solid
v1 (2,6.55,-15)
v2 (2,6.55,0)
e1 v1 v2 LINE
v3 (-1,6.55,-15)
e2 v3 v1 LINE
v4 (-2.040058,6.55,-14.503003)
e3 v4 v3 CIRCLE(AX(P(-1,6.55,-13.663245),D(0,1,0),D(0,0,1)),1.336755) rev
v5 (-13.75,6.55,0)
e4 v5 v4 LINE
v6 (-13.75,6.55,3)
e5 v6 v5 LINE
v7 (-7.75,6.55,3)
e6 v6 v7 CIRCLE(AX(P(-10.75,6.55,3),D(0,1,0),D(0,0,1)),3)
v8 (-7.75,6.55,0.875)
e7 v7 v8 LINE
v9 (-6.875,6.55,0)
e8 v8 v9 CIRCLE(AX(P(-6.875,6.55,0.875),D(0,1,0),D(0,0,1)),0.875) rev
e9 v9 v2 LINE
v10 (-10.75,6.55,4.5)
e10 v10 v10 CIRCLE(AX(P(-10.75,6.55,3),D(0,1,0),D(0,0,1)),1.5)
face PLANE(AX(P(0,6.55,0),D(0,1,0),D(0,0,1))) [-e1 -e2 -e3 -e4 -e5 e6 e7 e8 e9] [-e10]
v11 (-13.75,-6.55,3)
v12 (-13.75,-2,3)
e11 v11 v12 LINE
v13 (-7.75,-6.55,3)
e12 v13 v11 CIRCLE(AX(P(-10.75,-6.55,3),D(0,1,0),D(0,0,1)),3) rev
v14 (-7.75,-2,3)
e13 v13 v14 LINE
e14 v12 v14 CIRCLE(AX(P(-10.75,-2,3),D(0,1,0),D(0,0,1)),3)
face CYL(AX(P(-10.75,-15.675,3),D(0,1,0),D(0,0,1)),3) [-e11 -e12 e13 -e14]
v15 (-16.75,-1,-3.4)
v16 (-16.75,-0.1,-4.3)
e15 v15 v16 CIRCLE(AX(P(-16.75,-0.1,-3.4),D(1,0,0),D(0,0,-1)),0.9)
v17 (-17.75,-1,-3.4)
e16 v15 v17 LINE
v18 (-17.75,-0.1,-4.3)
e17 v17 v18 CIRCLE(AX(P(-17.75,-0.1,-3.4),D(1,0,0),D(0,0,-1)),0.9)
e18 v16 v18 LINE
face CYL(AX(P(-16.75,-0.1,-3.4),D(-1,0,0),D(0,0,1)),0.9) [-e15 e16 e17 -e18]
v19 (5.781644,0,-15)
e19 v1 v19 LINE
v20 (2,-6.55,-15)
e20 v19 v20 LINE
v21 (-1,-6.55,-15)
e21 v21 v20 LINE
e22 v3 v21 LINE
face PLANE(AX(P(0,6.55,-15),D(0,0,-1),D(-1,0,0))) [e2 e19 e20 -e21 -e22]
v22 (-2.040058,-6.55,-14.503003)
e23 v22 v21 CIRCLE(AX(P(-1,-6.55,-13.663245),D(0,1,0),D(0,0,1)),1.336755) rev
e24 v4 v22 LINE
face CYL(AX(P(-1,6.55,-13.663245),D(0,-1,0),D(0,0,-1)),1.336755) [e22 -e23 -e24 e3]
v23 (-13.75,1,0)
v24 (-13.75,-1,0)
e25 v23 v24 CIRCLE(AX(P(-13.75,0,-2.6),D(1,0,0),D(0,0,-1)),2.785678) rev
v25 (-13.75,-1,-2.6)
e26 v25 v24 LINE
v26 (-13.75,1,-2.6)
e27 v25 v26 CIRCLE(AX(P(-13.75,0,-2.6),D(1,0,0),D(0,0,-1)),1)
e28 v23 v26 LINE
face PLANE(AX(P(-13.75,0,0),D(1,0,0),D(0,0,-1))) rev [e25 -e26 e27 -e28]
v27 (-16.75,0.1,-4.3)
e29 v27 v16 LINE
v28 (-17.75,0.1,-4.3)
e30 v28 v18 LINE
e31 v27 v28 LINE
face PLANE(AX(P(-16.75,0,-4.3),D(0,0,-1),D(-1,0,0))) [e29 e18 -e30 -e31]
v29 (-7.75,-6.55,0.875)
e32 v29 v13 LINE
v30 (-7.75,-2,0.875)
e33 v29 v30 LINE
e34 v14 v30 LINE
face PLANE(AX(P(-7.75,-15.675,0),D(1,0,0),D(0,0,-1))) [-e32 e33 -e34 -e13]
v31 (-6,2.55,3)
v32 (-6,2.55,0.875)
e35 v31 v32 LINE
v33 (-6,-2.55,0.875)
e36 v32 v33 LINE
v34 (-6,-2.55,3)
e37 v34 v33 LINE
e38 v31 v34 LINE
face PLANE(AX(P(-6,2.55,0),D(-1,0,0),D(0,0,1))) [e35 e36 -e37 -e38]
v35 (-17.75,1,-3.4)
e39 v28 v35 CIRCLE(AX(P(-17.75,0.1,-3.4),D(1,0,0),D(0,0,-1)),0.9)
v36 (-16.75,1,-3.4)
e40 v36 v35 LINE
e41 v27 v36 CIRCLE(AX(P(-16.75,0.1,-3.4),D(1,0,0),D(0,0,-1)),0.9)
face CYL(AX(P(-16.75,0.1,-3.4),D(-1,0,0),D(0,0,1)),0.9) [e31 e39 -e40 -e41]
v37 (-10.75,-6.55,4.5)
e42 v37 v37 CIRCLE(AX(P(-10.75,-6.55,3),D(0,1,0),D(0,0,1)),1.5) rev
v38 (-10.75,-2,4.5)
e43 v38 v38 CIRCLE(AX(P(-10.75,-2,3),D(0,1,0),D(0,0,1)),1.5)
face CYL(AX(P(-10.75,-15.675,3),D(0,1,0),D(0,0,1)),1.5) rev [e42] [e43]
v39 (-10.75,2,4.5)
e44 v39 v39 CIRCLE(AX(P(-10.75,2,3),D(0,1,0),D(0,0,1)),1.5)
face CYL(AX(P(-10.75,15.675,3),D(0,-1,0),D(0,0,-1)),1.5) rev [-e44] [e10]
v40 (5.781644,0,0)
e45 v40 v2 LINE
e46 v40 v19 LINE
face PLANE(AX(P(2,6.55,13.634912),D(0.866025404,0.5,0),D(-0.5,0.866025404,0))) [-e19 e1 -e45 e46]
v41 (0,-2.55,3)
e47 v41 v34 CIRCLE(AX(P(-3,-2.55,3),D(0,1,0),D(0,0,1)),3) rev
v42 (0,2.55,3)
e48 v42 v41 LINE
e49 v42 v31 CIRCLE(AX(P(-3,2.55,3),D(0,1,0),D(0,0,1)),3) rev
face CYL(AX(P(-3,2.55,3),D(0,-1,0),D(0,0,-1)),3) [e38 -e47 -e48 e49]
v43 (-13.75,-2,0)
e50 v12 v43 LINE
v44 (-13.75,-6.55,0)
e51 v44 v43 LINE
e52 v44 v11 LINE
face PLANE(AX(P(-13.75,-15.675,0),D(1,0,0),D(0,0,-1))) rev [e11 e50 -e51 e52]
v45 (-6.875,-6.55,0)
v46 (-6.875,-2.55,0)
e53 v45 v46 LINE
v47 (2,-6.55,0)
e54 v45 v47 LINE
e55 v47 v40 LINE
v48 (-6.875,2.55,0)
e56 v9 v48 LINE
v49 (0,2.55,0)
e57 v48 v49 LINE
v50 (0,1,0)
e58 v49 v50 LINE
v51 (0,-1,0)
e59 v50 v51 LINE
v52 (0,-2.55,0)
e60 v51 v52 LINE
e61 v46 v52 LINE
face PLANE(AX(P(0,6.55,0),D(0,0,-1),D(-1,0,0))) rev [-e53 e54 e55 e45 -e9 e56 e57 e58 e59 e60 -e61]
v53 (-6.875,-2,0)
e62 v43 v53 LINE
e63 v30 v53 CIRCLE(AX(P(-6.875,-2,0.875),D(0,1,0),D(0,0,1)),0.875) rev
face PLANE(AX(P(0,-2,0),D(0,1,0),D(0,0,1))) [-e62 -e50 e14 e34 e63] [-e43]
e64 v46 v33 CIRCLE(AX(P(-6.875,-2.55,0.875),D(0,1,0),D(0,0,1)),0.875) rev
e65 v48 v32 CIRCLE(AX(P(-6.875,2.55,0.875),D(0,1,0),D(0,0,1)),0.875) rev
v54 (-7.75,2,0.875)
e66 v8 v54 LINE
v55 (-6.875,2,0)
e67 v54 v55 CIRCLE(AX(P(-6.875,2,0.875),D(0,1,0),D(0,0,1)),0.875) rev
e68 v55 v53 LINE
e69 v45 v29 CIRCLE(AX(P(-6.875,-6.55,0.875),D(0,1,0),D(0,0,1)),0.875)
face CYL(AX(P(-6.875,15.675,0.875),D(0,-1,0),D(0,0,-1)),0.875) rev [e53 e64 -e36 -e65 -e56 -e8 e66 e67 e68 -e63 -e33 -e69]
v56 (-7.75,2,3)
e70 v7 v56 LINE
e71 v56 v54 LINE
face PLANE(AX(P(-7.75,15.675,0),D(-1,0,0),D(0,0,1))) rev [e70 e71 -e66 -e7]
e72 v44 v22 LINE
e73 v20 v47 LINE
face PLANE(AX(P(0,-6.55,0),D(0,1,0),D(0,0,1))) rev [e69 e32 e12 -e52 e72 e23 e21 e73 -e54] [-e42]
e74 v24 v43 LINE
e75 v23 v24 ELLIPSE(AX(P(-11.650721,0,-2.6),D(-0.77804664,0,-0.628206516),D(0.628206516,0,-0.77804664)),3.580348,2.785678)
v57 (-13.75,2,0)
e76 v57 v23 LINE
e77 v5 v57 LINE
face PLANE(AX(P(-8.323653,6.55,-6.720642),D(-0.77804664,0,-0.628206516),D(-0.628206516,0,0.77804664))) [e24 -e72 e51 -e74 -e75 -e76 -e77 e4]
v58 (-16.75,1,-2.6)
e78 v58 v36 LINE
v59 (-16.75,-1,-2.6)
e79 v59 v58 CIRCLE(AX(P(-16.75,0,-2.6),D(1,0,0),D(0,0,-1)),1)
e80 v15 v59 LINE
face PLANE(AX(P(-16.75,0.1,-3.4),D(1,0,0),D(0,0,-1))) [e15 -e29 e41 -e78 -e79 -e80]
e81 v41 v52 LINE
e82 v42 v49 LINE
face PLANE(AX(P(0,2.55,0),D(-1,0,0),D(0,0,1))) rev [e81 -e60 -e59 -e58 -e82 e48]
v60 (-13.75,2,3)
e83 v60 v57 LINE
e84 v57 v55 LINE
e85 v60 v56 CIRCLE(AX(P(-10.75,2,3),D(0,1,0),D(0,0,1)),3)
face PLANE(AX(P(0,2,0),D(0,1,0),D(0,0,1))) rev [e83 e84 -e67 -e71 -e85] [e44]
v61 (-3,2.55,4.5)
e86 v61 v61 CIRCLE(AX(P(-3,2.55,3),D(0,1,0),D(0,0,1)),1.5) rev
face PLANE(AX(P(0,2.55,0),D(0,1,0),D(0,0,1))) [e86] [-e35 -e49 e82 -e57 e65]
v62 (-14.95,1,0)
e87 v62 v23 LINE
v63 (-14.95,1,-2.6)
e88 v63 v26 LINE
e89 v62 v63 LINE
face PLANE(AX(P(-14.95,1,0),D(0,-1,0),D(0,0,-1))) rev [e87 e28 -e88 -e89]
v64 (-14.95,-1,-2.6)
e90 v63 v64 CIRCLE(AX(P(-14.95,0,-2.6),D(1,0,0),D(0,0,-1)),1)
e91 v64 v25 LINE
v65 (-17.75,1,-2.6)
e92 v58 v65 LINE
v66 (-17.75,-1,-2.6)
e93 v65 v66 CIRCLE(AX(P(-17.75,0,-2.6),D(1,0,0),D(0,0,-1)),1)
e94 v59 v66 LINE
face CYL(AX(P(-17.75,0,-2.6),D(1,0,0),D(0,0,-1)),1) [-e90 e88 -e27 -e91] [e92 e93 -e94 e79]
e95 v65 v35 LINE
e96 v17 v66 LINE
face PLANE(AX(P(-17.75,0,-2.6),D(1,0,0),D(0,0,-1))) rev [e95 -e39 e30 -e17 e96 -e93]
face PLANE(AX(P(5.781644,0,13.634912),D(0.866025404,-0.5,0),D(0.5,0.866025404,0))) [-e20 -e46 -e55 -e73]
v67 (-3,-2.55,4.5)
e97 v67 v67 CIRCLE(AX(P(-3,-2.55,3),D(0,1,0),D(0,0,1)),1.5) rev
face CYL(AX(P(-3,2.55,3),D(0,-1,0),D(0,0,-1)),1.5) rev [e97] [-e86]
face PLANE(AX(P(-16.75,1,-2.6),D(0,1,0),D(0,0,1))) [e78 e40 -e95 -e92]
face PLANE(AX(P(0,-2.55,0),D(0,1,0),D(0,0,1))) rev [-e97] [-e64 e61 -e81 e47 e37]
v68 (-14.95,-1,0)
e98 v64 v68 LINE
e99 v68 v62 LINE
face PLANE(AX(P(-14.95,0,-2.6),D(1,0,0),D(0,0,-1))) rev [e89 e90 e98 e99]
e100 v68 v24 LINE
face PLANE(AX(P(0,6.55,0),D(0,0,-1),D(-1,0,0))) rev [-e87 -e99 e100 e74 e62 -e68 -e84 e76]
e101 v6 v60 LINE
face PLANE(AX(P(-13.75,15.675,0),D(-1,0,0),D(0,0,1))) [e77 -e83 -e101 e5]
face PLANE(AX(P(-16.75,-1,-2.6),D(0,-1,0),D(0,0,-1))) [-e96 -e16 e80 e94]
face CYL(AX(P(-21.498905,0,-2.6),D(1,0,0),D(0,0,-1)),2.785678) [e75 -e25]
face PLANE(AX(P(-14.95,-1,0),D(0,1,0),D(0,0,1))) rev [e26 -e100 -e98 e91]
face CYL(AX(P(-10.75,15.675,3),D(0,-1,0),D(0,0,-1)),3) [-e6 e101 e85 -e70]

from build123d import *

# Parameters (mm, degrees)
BOSS_EXTRUDE3_DEPTH  = 6.55
BOSS_EXTRUDE4_DEPTH  = 15
BOSS_EXTRUDE5_START  = 2
SKETCH1_4_R          = 1.5
BOSS_EXTRUDE5_DEPTH  = 4.55
BOSS_EXTRUDE6_START  = -6.55
SKETCH1_6_R          = 1.5
BOSS_EXTRUDE6_DEPTH  = 4.55
SKETCH1_8_R          = 1.5
BOSS_EXTRUDE11_DEPTH = 2.55
BOSS_EXTRUDE12_START = -13.75
BOSS_EXTRUDE12_DEPTH = 3.471884434
BOSS_EXTRUDE13_START = -13.75
SKETCH4_6_R          = 1
BOSS_EXTRUDE13_DEPTH = 13.75
BOSS_EXTRUDE14_START = -13.75
SKETCH4_7_R          = 1
BOSS_EXTRUDE14_DEPTH = 4
BOSS_EXTRUDE15_START = -16.75
BOSS_EXTRUDE15_DEPTH = 1
BOSS_EXTRUDE16_START = -13.75
BOSS_EXTRUDE16_DEPTH = 1.2


# Read off the part's stored shape, not the designer's step: Boss-Extrude12
with BuildPart() as part:
    # Sketch1 → Boss-Extrude3 (new, symmetric)
    with BuildSketch(Plane(origin=(0, 0, 0), x_dir=(1, 0, 0), z_dir=(0, 1, 0))):
        with BuildLine():
            Line((-2.040057994, 14.503003078), (-13.75, 0))
            Line((-13.75, 0), (-6.875, 0))
            Line((-6.875, 0), (0, 0))
            Line((0, 0), (2, 0))
            Line((2, 0), (2, 15))
            Line((2, 15), (-1, 15))
            ThreePointArc((-1, 15), (-1.576352013, 14.869367868), (-2.040057994, 14.503003078))
        make_face()
    extrude(amount=BOSS_EXTRUDE3_DEPTH, both=True)

    # Sketch2 → Boss-Extrude4 (add)
    with BuildSketch(Plane(origin=(0, 0, -15), x_dir=(-1, 0, 0), z_dir=(0, 0, -1))):
        Polygon((-2, 6.55), (-5.781644263, 0), (-2, -6.55), align=None)
    extrude(amount=-BOSS_EXTRUDE4_DEPTH)

    # Sketch1<4> → Boss-Extrude5 (add)
    with BuildSketch(Plane(origin=(0, 0, 0), x_dir=(1, 0, 0), z_dir=(0, 1, 0)).offset(BOSS_EXTRUDE5_START)):
        with BuildLine():
            Line((-6.875, 0), (-13.75, 0))
            Line((-13.75, 0), (-13.75, -3))
            ThreePointArc((-13.75, -3), (-10.75, -6), (-7.75, -3))
            Line((-7.75, -3), (-7.75, -0.875))
            ThreePointArc((-7.75, -0.875), (-7.493718434, -0.256281566), (-6.875, 0))
        make_face()
        with Locations(Location((-10.75, -3, 0), (0, 0, 270))):
            Circle(SKETCH1_4_R, mode=Mode.SUBTRACT)
    extrude(amount=BOSS_EXTRUDE5_DEPTH)

    # Sketch1<6> → Boss-Extrude6 (add)
    with BuildSketch(Plane(origin=(0, 0, 0), x_dir=(1, 0, 0), z_dir=(0, 1, 0)).offset(BOSS_EXTRUDE6_START)):
        with BuildLine():
            Line((-6.875, 0), (-13.75, 0))
            Line((-13.75, 0), (-13.75, -3))
            ThreePointArc((-13.75, -3), (-10.75, -6), (-7.75, -3))
            Line((-7.75, -3), (-7.75, -0.875))
            ThreePointArc((-7.75, -0.875), (-7.493718434, -0.256281566), (-6.875, 0))
        make_face()
        with Locations(Location((-10.75, -3, 0), (0, 0, 270))):
            Circle(SKETCH1_6_R, mode=Mode.SUBTRACT)
    extrude(amount=BOSS_EXTRUDE6_DEPTH)

    # Sketch1<8> → Boss-Extrude11 (add, symmetric)
    with BuildSketch(Plane(origin=(0, 0, 0), x_dir=(1, 0, 0), z_dir=(0, 1, 0))):
        with BuildLine():
            Line((0, 0), (-6.875, 0))
            ThreePointArc((-6.875, 0), (-6.256281566, -0.256281566), (-6, -0.875))
            Line((-6, -0.875), (-6, -3))
            ThreePointArc((-6, -3), (-3, -6), (0, -3))
            Line((0, -3), (0, 0))
        make_face()
        with Locations(Location((-3, -3, 0), (0, 0, 270))):
            Circle(SKETCH1_8_R, mode=Mode.SUBTRACT)
    extrude(amount=BOSS_EXTRUDE11_DEPTH, both=True)

    # Boss-Extrude12 outline → Boss-Extrude12 (add)
    with BuildSketch(Plane(origin=(0, 0, 0), x_dir=(0, 0, -1), z_dir=(1, 0, 0)).offset(BOSS_EXTRUDE12_START)):
        with BuildLine():
            Line((3.4, 1), (0, 1))
            Line((0, 1), (0, -1))
            Line((0, -1), (3.4, -1))
            ThreePointArc((3.4, -1), (4.036396103, -0.736396103), (4.3, -0.1))
            Line((4.3, -0.1), (4.3, 0.1))
            ThreePointArc((4.3, 0.1), (4.036396103, 0.736396103), (3.4, 1))
        make_face()
    extrude(amount=BOSS_EXTRUDE12_DEPTH)

    # Sketch4<6> → Boss-Extrude13 (add)
    with BuildSketch(Plane(origin=(0, 0, 0), x_dir=(0, 0, -1), z_dir=(1, 0, 0)).offset(BOSS_EXTRUDE13_START)):
        with Locations((2.6, 0)):
            Circle(SKETCH4_6_R)
        with BuildLine():
            Line((2.6, -1), (0, -1))
            ThreePointArc((0, -1), (5.385677655, 0), (0, 1))
            Line((0, 1), (2.6, 1))
            Line((2.6, 1), (3.4, 1))
            ThreePointArc((3.4, 1), (4.036396103, 0.736396103), (4.3, 0.1))
            Line((4.3, 0.1), (4.3, -0.1))
            ThreePointArc((4.3, -0.1), (4.036396103, -0.736396103), (3.4, -1))
            Line((3.4, -1), (2.6, -1))
        make_face()
    extrude(amount=BOSS_EXTRUDE13_DEPTH)

    # Sketch4<7> → Boss-Extrude14 (add)
    with BuildSketch(Plane(origin=(0, 0, 0), x_dir=(0, 0, -1), z_dir=(1, 0, 0)).offset(BOSS_EXTRUDE14_START)):
        with Locations((2.6, 0)):
            Circle(SKETCH4_7_R)
    extrude(amount=-BOSS_EXTRUDE14_DEPTH)

    # Sketch4<8> → Boss-Extrude15 (add)
    with BuildSketch(Plane(origin=(0, 0, 0), x_dir=(0, 0, -1), z_dir=(1, 0, 0)).offset(BOSS_EXTRUDE15_START)):
        with BuildLine():
            ThreePointArc((3.6, 0), (3.307106781, -0.707106781), (2.6, -1))
            Line((2.6, -1), (3.4, -1))
            ThreePointArc((3.4, -1), (4.036396103, -0.736396103), (4.3, -0.1))
            Line((4.3, -0.1), (4.3, 0.1))
            ThreePointArc((4.3, 0.1), (4.036396103, 0.736396103), (3.4, 1))
            Line((3.4, 1), (2.6, 1))
            ThreePointArc((2.6, 1), (3.307106781, 0.707106781), (3.6, 0))
        make_face()
    extrude(amount=-BOSS_EXTRUDE15_DEPTH)

    # Sketch4<9> → Boss-Extrude16 (add)
    with BuildSketch(Plane(origin=(0, 0, 0), x_dir=(0, 0, -1), z_dir=(1, 0, 0)).offset(BOSS_EXTRUDE16_START)):
        with BuildLine():
            Line((0, -1), (2.6, -1))
            ThreePointArc((2.6, -1), (1.6, 0), (2.6, 1))
            Line((2.6, 1), (0, 1))
            Line((0, 1), (0, -1))
        make_face()
    extrude(amount=-BOSS_EXTRUDE16_DEPTH)


solid = part.part
